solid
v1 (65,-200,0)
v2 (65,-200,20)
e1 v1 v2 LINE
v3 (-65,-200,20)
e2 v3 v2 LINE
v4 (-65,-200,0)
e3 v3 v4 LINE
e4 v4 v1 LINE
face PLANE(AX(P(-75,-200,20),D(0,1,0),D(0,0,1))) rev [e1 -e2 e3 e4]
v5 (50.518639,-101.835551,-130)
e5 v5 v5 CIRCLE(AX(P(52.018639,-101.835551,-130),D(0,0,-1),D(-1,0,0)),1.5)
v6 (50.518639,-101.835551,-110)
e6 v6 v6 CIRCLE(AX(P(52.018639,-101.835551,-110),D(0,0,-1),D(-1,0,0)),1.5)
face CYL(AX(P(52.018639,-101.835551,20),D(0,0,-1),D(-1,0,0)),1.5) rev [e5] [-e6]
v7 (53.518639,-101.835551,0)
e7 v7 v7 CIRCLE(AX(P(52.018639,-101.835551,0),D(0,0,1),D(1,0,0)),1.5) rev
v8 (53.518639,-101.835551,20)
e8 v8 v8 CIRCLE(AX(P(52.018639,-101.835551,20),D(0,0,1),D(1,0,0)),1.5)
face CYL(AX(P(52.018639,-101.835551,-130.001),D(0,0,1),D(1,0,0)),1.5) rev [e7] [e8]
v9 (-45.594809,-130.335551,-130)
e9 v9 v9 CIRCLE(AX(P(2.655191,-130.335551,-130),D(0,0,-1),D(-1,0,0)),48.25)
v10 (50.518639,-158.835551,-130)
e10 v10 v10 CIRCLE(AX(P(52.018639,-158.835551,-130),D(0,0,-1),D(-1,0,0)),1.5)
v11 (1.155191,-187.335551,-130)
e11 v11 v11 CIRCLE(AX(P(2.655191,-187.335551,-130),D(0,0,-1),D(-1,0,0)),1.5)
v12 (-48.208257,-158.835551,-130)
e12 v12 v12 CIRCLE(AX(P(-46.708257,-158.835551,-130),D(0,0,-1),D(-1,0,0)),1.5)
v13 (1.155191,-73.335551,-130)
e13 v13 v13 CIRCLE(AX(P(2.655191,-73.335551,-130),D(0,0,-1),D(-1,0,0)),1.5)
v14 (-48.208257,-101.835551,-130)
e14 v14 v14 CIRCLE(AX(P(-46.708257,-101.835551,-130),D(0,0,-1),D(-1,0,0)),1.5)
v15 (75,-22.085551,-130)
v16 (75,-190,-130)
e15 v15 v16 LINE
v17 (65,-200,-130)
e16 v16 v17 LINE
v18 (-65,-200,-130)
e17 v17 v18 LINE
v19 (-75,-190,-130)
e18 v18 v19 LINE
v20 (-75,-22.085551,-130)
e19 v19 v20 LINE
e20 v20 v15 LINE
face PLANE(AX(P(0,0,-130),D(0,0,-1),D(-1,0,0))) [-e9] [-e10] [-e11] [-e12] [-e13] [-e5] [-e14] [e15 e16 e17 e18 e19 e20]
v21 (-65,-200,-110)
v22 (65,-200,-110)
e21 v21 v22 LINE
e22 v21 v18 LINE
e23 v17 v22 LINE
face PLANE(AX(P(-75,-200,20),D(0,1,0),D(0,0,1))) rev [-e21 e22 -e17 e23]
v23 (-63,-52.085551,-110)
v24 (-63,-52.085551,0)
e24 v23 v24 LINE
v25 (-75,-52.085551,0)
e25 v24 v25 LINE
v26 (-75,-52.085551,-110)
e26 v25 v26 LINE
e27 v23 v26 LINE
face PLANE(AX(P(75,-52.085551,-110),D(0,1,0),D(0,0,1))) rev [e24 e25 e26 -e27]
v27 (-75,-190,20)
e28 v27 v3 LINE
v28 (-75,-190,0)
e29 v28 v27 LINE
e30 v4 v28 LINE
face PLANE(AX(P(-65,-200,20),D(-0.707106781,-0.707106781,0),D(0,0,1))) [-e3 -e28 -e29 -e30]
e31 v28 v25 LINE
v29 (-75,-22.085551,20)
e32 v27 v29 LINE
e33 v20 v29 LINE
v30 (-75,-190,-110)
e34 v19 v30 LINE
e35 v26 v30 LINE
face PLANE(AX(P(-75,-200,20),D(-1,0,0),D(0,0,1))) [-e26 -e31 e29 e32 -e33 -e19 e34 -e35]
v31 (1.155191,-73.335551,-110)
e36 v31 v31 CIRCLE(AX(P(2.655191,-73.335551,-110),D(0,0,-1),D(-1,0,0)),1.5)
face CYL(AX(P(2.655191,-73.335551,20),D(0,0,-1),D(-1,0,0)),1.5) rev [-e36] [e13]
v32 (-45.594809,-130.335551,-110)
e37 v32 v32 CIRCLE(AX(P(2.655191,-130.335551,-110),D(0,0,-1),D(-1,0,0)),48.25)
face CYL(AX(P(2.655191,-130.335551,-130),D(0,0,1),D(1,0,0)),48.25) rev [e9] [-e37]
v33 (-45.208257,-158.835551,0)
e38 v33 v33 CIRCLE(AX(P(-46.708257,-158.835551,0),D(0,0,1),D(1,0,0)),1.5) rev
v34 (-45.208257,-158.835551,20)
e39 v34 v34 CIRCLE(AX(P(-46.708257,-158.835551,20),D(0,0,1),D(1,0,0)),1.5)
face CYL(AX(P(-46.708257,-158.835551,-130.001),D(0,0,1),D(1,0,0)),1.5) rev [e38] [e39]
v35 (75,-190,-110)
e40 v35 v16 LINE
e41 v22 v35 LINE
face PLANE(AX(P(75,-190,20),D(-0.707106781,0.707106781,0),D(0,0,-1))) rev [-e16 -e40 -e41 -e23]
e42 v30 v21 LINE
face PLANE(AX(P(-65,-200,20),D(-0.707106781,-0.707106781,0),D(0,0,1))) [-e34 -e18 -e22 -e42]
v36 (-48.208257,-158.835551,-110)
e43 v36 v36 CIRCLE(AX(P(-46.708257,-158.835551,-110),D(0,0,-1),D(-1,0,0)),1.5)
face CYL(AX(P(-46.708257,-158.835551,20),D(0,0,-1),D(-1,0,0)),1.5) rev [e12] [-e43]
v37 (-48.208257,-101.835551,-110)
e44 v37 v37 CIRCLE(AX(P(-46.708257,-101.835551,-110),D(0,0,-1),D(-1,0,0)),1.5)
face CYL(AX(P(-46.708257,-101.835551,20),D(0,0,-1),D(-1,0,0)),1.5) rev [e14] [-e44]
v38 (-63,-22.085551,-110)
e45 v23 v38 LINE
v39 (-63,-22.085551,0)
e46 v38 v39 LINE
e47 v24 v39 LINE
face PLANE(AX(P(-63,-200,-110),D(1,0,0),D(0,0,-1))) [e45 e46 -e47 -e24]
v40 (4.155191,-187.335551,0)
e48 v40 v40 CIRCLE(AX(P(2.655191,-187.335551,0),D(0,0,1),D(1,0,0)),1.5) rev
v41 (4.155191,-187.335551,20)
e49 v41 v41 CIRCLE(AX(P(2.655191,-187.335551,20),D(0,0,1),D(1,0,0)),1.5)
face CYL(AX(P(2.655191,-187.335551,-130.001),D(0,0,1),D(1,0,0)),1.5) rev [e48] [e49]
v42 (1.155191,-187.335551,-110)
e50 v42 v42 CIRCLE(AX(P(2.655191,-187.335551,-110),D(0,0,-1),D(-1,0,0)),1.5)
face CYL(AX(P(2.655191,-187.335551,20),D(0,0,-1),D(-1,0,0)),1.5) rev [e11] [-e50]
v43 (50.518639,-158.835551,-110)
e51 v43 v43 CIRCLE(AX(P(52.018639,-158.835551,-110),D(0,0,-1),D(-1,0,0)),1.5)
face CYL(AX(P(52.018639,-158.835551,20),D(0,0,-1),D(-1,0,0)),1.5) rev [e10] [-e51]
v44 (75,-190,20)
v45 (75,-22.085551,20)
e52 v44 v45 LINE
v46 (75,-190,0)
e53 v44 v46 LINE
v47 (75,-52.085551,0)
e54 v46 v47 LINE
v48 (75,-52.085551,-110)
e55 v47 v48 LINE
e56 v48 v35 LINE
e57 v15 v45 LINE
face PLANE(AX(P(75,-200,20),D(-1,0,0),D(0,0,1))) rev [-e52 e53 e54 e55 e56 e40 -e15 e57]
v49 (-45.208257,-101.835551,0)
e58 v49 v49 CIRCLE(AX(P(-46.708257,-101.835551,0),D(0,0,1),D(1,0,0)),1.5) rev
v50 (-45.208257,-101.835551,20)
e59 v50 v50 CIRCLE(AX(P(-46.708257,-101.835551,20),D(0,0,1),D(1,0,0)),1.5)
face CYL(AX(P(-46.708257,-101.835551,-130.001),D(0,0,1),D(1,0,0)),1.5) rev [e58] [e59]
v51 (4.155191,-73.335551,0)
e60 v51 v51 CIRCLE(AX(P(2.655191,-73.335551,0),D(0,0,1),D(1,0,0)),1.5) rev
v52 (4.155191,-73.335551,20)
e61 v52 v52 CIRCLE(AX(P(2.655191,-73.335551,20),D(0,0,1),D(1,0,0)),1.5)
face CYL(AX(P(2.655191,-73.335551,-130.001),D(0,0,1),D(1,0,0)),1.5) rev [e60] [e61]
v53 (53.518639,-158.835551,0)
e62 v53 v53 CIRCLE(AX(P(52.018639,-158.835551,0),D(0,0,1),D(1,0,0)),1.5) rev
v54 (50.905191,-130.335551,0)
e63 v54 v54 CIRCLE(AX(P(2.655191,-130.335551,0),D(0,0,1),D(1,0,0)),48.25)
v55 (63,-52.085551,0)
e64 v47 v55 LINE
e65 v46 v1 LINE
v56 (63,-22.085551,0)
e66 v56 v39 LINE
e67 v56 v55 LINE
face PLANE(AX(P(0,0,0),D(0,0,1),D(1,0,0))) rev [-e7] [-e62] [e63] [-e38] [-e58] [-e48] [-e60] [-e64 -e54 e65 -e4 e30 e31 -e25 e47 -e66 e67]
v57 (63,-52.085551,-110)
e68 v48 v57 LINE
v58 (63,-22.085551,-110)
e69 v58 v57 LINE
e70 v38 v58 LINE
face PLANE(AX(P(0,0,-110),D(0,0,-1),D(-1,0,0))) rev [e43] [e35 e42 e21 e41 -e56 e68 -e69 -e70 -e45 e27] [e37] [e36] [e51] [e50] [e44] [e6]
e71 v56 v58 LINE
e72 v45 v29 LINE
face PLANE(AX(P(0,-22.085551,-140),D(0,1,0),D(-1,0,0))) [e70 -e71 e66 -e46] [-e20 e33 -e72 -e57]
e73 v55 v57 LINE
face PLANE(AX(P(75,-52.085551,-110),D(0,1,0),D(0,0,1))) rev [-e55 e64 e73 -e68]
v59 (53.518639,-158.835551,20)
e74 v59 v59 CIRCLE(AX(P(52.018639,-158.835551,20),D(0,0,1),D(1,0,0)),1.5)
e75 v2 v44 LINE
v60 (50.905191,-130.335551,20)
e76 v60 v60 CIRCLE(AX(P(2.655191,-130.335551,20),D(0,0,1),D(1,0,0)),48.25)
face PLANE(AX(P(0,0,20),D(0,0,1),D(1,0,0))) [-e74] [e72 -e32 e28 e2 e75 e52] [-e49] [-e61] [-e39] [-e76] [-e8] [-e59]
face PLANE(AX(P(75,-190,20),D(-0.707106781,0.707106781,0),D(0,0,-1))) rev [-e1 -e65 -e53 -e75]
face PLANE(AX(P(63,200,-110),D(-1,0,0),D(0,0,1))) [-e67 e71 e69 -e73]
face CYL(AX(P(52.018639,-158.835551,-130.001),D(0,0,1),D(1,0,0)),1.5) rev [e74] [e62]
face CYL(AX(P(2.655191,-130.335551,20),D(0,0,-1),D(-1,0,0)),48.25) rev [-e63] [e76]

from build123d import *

# Parameters (mm, degrees)
EXTRUDE_1_OUTLINE_W     = 150
EXTRUDE_1_OUTLINE_H     = 400
EXTRUDE_1_OUTLINE_R     = 48.25
EXTRUDE_1_DEPTH         = 20
SKETCH_2_W              = 150
SKETCH_2_H              = 400
SKETCH_2_W_2            = 126
SKETCH_2_H_2            = 376
EXTRUDE_1_2_DEPTH       = 110
EXTRUDE_START           = 20
SKETCH_3_W              = 150
SKETCH_3_H              = 400
SKETCH_3_R              = 48.25
EXTRUDE_3_DEPTH         = 20
SKETCH_4_W              = 110
SKETCH_4_H              = 55
CUT_EXTRUDE_1_DEPTH     = 428.229446551
CHAMFER_2_SIZE          = 20
CHAMFER_3_SIZE          = 20
CUT_EXTRUDE_START       = 190
CUT_EXTRUDE_2_OUTLINE_W = 132
CUT_EXTRUDE_2_OUTLINE_H = 152
CUT_EXTRUDE_2_DEPTH     = 10
FILLET_1_R              = 20
FILLET_2_R              = 20
FILLET_3_R              = 20
FILLET_4_R              = 20
EXTRUDE_START_2         = -20
SKETCH_6_R              = 48.25
SKETCH_6_R_2            = 29.5
EXTRUDE_4_DEPTH         = 20
SKETCH_7_R              = 48.25
SKETCH_7_R_2            = 29.5
EXTRUDE_5_DEPTH         = 20
SKETCH_8_R              = 29.5
EXTRUDE_7_DEPTH         = 20
SKETCH_9_R              = 29.5
EXTRUDE_8_DEPTH         = 20
SKETCH_10_R             = 1.65
EXTRUDE_9_DEPTH         = 10
EXTRUDE_START_3         = 10
SKETCH_11_R             = 1.65
EXTRUDE_10_DEPTH        = 10
SKETCH_12_W             = 110
SKETCH_12_H             = 147.914448675
CUT_EXTRUDE_3_DEPTH     = 287.530975638
CHAMFER_4_SIZE          = 10
CHAMFER_5_SIZE          = 10
SKETCH_13_W             = 150
SKETCH_13_H             = 80
CUT_EXTRUDE_5_DEPTH     = 267.880122902
CUT_EXTRUDE_6_REACH     = 263.008
SKETCH_15_R             = 1.5
SKETCH_16_R             = 1.5
CUT_EXTRUDE_7_DEPTH     = 262.007662723


with BuildPart() as part:
    # Extrude 1: read off the stored shape, not the designer's step
    # Extrude 1 outline → Extrude 1 (new body)
    with BuildSketch(Plane.XY):
        Rectangle(EXTRUDE_1_OUTLINE_W, EXTRUDE_1_OUTLINE_H)
        with Locations((2.655190842, -130.335551325)):
            Circle(EXTRUDE_1_OUTLINE_R, mode=Mode.SUBTRACT)
        with Locations((0, 129.13990983)):
            Circle(EXTRUDE_1_OUTLINE_R, mode=Mode.SUBTRACT)
    extrude(amount=EXTRUDE_1_DEPTH)

    # 草图2 → Extrude 1 2 (add)
    with BuildSketch(Plane(origin=(0, 0, 0), x_dir=(-1, 0, 0), z_dir=(0, 0, -1))):
        Rectangle(SKETCH_2_W, SKETCH_2_H)
        Rectangle(SKETCH_2_W_2, SKETCH_2_H_2, mode=Mode.SUBTRACT)
    extrude(amount=EXTRUDE_1_2_DEPTH)

    # 草图3 → 凸台-拉伸3 (add)
    with BuildSketch(Plane(origin=(0, 0, -110), x_dir=(-1, 0, 0), z_dir=(0, 0, -1)).offset(EXTRUDE_START)):
        Rectangle(SKETCH_3_W, SKETCH_3_H)
        with Locations(Location((-2.655190842, -130.335551325, 0), (0, 0, 180))):
            Circle(SKETCH_3_R, mode=Mode.SUBTRACT)
        with Locations(Location((0, 129.13990983, 0), (0, 0, 180))):
            Circle(SKETCH_3_R, mode=Mode.SUBTRACT)
    extrude(amount=-EXTRUDE_3_DEPTH)

    # 草图4 → 切除-拉伸1 (cut, through all)
    with BuildSketch(Plane.XZ.offset(200)):
        with Locations((0, -27.5)):
            Rectangle(SKETCH_4_W, SKETCH_4_H)
        with Locations((0, -82.5)):
            Rectangle(SKETCH_4_W, SKETCH_4_H)
    extrude(amount=-CUT_EXTRUDE_1_DEPTH, mode=Mode.SUBTRACT)

    # 倒角2
    chamfer_2_edges = [part.edges().sort_by_distance(p)[0] for p in [
        (-75, 200, -55),
    ]]
    chamfer(chamfer_2_edges, length=CHAMFER_2_SIZE - 0.0001)  # a hair under: the kernel refuses the full size

    # 倒角3
    chamfer_3_edges = [part.edges().sort_by_distance(p)[0] for p in [
        (75, 200, -55),
    ]]
    chamfer(chamfer_3_edges, length=CHAMFER_3_SIZE - 0.0001)  # a hair under: the kernel refuses the full size

    # 切除-拉伸2: read off the stored shape, not the designer's step
    # 切除-拉伸2 outline → 切除-拉伸2 (cut)
    with BuildSketch(Plane(origin=(0, 0, 0), x_dir=(1, 0, 0), z_dir=(0, 1, 0)).offset(CUT_EXTRUDE_START)):
        with Locations((0, 55)):
            Rectangle(CUT_EXTRUDE_2_OUTLINE_W, CUT_EXTRUDE_2_OUTLINE_H)
    extrude(amount=CUT_EXTRUDE_2_DEPTH, mode=Mode.SUBTRACT)

    # 圆角1
    fillet_1_edges = [part.edges().sort_by_distance(p)[0] for p in [
        (-65.0001, 190, -55),
    ]]
    fillet(fillet_1_edges, radius=FILLET_1_R)

    # 圆角2
    fillet_2_edges = [part.edges().sort_by_distance(p)[0] for p in [
        (65.0001, 190, -55),
    ]]
    fillet(fillet_2_edges, radius=FILLET_2_R)

    # 圆角3
    # the kernel refuses this fillet: 20 mm, written as the material it takes off along each edge
    with BuildSketch(Plane(origin=(-75, 180.0001, 40.112615753), x_dir=(0.7071067811865488, 0.7071067811865464, 0), z_dir=(0, 0, -1))) as fillet_3_piece_1:
        with BuildLine():
            CenterArc((8.453428829, 19.830842418), FILLET_3_R, 225, 37.542814558)
            Line((-5.688706794, 5.688706794), (-5.971549507, 5.405864082))
            Line((-5.971549507, 5.405864082), (-0.282842712, -0.282842712))
            Line((-0.282842712, -0.282842712), (0, -0.4))
            ThreePointArc((0, -0.4), (2.928861477, -0.4), (5.805808837, -0.396616848))
            Line((5.805808837, -0.396616848), (5.857722955, 0))
        make_face()
    extrude(amount=190.225231505, mode=Mode.SUBTRACT)

    # 圆角4
    # the kernel refuses this fillet: 20 mm, written as the material it takes off along each edge
    with BuildSketch(Plane(origin=(75, 180.0001, -150.112615753), x_dir=(-0.7071067811865438, 0.7071067811865511, 0), z_dir=(0, 0, 1))) as fillet_4_piece_1:
        with BuildLine():
            CenterArc((8.453428829, 19.830842418), FILLET_4_R, 225, 37.542814558)
            Line((-5.688706794, 5.688706794), (-5.971549507, 5.405864082))
            Line((-5.971549507, 5.405864082), (-0.282842712, -0.282842712))
            Line((-0.282842712, -0.282842712), (0, -0.4))
            ThreePointArc((0, -0.4), (2.928861477, -0.4), (5.805808837, -0.396616848))
            Line((5.805808837, -0.396616848), (5.857722955, 0))
        make_face()
    extrude(amount=190.225231505, mode=Mode.SUBTRACT)

    # 草图6 → 凸台-拉伸4 (add)
    with BuildSketch(Plane.XY.offset(20).offset(EXTRUDE_START_2)):
        with Locations(Location((0, 129.13990983, 0), (0, 0, 180))):
            Circle(SKETCH_6_R)
        with Locations((0, 129.13990983)):
            Circle(SKETCH_6_R_2, mode=Mode.SUBTRACT)
    extrude(amount=EXTRUDE_4_DEPTH)

    # 草图7 → 凸台-拉伸5 (add)
    with BuildSketch(Plane(origin=(0, 0, -130), x_dir=(-1, 0, 0), z_dir=(0, 0, -1))):
        with Locations((0, 129.13990983)):
            Circle(SKETCH_7_R)
        with Locations(Location((0, 129.13990983, 0), (0, 0, 180))):
            Circle(SKETCH_7_R_2, mode=Mode.SUBTRACT)
    extrude(amount=-EXTRUDE_5_DEPTH)

    # 草图8 → 凸台-拉伸7 (add)
    with BuildSketch(Plane.XY.offset(20).offset(EXTRUDE_START_2)):
        with Locations(Location((0, 129.13990983, 0), (0, 0, 180))):
            Circle(SKETCH_8_R)
    extrude(amount=EXTRUDE_7_DEPTH)

    # 草图9 → 凸台-拉伸8 (add)
    with BuildSketch(Plane(origin=(0, 0, -130), x_dir=(-1, 0, 0), z_dir=(0, 0, -1))):
        with Locations((0, 129.13990983)):
            Circle(SKETCH_9_R)
    extrude(amount=-EXTRUDE_8_DEPTH)

    # 草图10 → 凸台-拉伸9 (add)
    with BuildSketch(Plane(origin=(0, 0, -130), x_dir=(-1, 0, 0), z_dir=(0, 0, -1))):
        with Locations((0, 146.38990983)):
            Circle(SKETCH_10_R)
        with Locations((14.938938215, 137.76490983)):
            Circle(SKETCH_10_R)
        with Locations((14.938938215, 120.51490983)):
            Circle(SKETCH_10_R)
        with Locations((0, 111.88990983)):
            Circle(SKETCH_10_R)
        with Locations((-14.938938215, 120.51490983)):
            Circle(SKETCH_10_R)
        with Locations((-14.938938215, 137.76490983)):
            Circle(SKETCH_10_R)
    extrude(amount=EXTRUDE_9_DEPTH)

    # 草图11 → 凸台-拉伸10 (add)
    with BuildSketch(Plane.XY.offset(20).offset(EXTRUDE_START_3)):
        with Locations(Location((-14.938938215, 137.76490983, 0), (0, 0, 180))):
            Circle(SKETCH_11_R)
        with Locations(Location((-14.938938215, 120.51490983, 0), (0, 0, 180))):
            Circle(SKETCH_11_R)
        with Locations(Location((0, 111.88990983, 0), (0, 0, 180))):
            Circle(SKETCH_11_R)
        with Locations(Location((14.938938215, 120.51490983, 0), (0, 0, 180))):
            Circle(SKETCH_11_R)
        with Locations(Location((0, 146.38990983, 0), (0, 0, 180))):
            Circle(SKETCH_11_R)
        with Locations(Location((14.938938215, 137.76490983, 0), (0, 0, 180))):
            Circle(SKETCH_11_R)
    extrude(amount=-EXTRUDE_10_DEPTH)

    # 草图12 → 切除-拉伸3 (cut, through all)
    with BuildSketch(Plane.ZY.offset(75)):
        with Locations((-55, -126.042775663)):
            Rectangle(SKETCH_12_W, SKETCH_12_H)
    extrude(amount=-CUT_EXTRUDE_3_DEPTH, mode=Mode.SUBTRACT)

    # 倒角4
    chamfer_4_edges = [part.edges().sort_by_distance(p)[0] for p in [
        (-75, -200, -120),
    ]]
    chamfer(chamfer_4_edges, length=CHAMFER_4_SIZE)

    # 倒角5
    chamfer_5_edges = [part.edges().sort_by_distance(p)[0] for p in [
        (75, -200, -120),
        (-75, -200, 10),
        (75, -200, 10),
    ]]
    chamfer(chamfer_5_edges, length=CHAMFER_5_SIZE)

    # 草图13 → 切除-拉伸5 (cut, through all)
    with BuildSketch(Plane.XY.offset(20)):
        with Locations((0, 17.914448675)):
            Rectangle(SKETCH_13_W, SKETCH_13_H)
    extrude(amount=-CUT_EXTRUDE_5_DEPTH, mode=Mode.SUBTRACT)


with BuildPart() as body_2:
    # of the pieces the cut leaves, the one that is kept (cut_extrude_5_keep)
    add(part.part.solids().sort_by_distance((65, -200, -110))[0])

    # 草图15 → 切除-拉伸6 (cut, up to next)
    with BuildSketch(Plane.XY.offset(20), mode=Mode.PRIVATE) as cut_extrude_6_sk1:
        with Locations((2.655190842, -73.335551325)):
            Circle(SKETCH_15_R)
    cut_extrude_6_tool1 = extrude(cut_extrude_6_sk1.sketch, amount=-CUT_EXTRUDE_6_REACH, mode=Mode.PRIVATE) & body_2.part
    # 草图15 → 切除-拉伸6 (cut, up to next)
    with BuildSketch(Plane.XY.offset(20), mode=Mode.PRIVATE) as cut_extrude_6_sk2:
        with Locations((52.018638858, -101.835551325)):
            Circle(SKETCH_15_R)
    cut_extrude_6_tool2 = extrude(cut_extrude_6_sk2.sketch, amount=-CUT_EXTRUDE_6_REACH, mode=Mode.PRIVATE) & body_2.part
    # 草图15 → 切除-拉伸6 (cut, up to next)
    with BuildSketch(Plane.XY.offset(20), mode=Mode.PRIVATE) as cut_extrude_6_sk3:
        with Locations((52.018638858, -158.835551325)):
            Circle(SKETCH_15_R)
    cut_extrude_6_tool3 = extrude(cut_extrude_6_sk3.sketch, amount=-CUT_EXTRUDE_6_REACH, mode=Mode.PRIVATE) & body_2.part
    # 草图15 → 切除-拉伸6 (cut, up to next)
    with BuildSketch(Plane.XY.offset(20), mode=Mode.PRIVATE) as cut_extrude_6_sk4:
        with Locations((2.655190842, -187.335551325)):
            Circle(SKETCH_15_R)
    cut_extrude_6_tool4 = extrude(cut_extrude_6_sk4.sketch, amount=-CUT_EXTRUDE_6_REACH, mode=Mode.PRIVATE) & body_2.part
    # 草图15 → 切除-拉伸6 (cut, up to next)
    with BuildSketch(Plane.XY.offset(20), mode=Mode.PRIVATE) as cut_extrude_6_sk5:
        with Locations((-46.708257174, -158.835551325)):
            Circle(SKETCH_15_R)
    cut_extrude_6_tool5 = extrude(cut_extrude_6_sk5.sketch, amount=-CUT_EXTRUDE_6_REACH, mode=Mode.PRIVATE) & body_2.part
    # 草图15 → 切除-拉伸6 (cut, up to next)
    with BuildSketch(Plane.XY.offset(20), mode=Mode.PRIVATE) as cut_extrude_6_sk6:
        with Locations((-46.708257174, -101.835551325)):
            Circle(SKETCH_15_R)
    cut_extrude_6_tool6 = extrude(cut_extrude_6_sk6.sketch, amount=-CUT_EXTRUDE_6_REACH, mode=Mode.PRIVATE) & body_2.part
    add(cut_extrude_6_tool1.solids().sort_by_distance((2.655191, -73.335551, 20))[0], mode=Mode.SUBTRACT)
    add(cut_extrude_6_tool2.solids().sort_by_distance((52.018639, -101.835551, 20))[0], mode=Mode.SUBTRACT)
    add(cut_extrude_6_tool3.solids().sort_by_distance((52.018639, -158.835551, 20))[0], mode=Mode.SUBTRACT)
    add(cut_extrude_6_tool4.solids().sort_by_distance((2.655191, -187.335551, 20))[0], mode=Mode.SUBTRACT)
    add(cut_extrude_6_tool5.solids().sort_by_distance((-46.708257, -158.835551, 20))[0], mode=Mode.SUBTRACT)
    add(cut_extrude_6_tool6.solids().sort_by_distance((-46.708257, -101.835551, 20))[0], mode=Mode.SUBTRACT)

    # 草图16 → 切除-拉伸7 (cut, through all)
    with BuildSketch(Plane(origin=(0, 0, -130), x_dir=(-1, 0, 0), z_dir=(0, 0, -1))):
        with Locations(Location((-52.018638858, -101.835551325, 0), (0, 0, 180))):
            Circle(SKETCH_16_R)
        with Locations(Location((-2.655190842, -73.335551325, 0), (0, 0, 180))):
            Circle(SKETCH_16_R)
        with Locations(Location((46.708257174, -158.835551325, 0), (0, 0, 180))):
            Circle(SKETCH_16_R)
        with Locations(Location((-52.018638858, -158.835551325, 0), (0, 0, 180))):
            Circle(SKETCH_16_R)
        with Locations(Location((-2.655190842, -187.335551325, 0), (0, 0, 180))):
            Circle(SKETCH_16_R)
        with Locations(Location((46.708257174, -101.835551325, 0), (0, 0, 180))):
            Circle(SKETCH_16_R)
    extrude(amount=-CUT_EXTRUDE_7_DEPTH, mode=Mode.SUBTRACT)


solid = body_2.part
